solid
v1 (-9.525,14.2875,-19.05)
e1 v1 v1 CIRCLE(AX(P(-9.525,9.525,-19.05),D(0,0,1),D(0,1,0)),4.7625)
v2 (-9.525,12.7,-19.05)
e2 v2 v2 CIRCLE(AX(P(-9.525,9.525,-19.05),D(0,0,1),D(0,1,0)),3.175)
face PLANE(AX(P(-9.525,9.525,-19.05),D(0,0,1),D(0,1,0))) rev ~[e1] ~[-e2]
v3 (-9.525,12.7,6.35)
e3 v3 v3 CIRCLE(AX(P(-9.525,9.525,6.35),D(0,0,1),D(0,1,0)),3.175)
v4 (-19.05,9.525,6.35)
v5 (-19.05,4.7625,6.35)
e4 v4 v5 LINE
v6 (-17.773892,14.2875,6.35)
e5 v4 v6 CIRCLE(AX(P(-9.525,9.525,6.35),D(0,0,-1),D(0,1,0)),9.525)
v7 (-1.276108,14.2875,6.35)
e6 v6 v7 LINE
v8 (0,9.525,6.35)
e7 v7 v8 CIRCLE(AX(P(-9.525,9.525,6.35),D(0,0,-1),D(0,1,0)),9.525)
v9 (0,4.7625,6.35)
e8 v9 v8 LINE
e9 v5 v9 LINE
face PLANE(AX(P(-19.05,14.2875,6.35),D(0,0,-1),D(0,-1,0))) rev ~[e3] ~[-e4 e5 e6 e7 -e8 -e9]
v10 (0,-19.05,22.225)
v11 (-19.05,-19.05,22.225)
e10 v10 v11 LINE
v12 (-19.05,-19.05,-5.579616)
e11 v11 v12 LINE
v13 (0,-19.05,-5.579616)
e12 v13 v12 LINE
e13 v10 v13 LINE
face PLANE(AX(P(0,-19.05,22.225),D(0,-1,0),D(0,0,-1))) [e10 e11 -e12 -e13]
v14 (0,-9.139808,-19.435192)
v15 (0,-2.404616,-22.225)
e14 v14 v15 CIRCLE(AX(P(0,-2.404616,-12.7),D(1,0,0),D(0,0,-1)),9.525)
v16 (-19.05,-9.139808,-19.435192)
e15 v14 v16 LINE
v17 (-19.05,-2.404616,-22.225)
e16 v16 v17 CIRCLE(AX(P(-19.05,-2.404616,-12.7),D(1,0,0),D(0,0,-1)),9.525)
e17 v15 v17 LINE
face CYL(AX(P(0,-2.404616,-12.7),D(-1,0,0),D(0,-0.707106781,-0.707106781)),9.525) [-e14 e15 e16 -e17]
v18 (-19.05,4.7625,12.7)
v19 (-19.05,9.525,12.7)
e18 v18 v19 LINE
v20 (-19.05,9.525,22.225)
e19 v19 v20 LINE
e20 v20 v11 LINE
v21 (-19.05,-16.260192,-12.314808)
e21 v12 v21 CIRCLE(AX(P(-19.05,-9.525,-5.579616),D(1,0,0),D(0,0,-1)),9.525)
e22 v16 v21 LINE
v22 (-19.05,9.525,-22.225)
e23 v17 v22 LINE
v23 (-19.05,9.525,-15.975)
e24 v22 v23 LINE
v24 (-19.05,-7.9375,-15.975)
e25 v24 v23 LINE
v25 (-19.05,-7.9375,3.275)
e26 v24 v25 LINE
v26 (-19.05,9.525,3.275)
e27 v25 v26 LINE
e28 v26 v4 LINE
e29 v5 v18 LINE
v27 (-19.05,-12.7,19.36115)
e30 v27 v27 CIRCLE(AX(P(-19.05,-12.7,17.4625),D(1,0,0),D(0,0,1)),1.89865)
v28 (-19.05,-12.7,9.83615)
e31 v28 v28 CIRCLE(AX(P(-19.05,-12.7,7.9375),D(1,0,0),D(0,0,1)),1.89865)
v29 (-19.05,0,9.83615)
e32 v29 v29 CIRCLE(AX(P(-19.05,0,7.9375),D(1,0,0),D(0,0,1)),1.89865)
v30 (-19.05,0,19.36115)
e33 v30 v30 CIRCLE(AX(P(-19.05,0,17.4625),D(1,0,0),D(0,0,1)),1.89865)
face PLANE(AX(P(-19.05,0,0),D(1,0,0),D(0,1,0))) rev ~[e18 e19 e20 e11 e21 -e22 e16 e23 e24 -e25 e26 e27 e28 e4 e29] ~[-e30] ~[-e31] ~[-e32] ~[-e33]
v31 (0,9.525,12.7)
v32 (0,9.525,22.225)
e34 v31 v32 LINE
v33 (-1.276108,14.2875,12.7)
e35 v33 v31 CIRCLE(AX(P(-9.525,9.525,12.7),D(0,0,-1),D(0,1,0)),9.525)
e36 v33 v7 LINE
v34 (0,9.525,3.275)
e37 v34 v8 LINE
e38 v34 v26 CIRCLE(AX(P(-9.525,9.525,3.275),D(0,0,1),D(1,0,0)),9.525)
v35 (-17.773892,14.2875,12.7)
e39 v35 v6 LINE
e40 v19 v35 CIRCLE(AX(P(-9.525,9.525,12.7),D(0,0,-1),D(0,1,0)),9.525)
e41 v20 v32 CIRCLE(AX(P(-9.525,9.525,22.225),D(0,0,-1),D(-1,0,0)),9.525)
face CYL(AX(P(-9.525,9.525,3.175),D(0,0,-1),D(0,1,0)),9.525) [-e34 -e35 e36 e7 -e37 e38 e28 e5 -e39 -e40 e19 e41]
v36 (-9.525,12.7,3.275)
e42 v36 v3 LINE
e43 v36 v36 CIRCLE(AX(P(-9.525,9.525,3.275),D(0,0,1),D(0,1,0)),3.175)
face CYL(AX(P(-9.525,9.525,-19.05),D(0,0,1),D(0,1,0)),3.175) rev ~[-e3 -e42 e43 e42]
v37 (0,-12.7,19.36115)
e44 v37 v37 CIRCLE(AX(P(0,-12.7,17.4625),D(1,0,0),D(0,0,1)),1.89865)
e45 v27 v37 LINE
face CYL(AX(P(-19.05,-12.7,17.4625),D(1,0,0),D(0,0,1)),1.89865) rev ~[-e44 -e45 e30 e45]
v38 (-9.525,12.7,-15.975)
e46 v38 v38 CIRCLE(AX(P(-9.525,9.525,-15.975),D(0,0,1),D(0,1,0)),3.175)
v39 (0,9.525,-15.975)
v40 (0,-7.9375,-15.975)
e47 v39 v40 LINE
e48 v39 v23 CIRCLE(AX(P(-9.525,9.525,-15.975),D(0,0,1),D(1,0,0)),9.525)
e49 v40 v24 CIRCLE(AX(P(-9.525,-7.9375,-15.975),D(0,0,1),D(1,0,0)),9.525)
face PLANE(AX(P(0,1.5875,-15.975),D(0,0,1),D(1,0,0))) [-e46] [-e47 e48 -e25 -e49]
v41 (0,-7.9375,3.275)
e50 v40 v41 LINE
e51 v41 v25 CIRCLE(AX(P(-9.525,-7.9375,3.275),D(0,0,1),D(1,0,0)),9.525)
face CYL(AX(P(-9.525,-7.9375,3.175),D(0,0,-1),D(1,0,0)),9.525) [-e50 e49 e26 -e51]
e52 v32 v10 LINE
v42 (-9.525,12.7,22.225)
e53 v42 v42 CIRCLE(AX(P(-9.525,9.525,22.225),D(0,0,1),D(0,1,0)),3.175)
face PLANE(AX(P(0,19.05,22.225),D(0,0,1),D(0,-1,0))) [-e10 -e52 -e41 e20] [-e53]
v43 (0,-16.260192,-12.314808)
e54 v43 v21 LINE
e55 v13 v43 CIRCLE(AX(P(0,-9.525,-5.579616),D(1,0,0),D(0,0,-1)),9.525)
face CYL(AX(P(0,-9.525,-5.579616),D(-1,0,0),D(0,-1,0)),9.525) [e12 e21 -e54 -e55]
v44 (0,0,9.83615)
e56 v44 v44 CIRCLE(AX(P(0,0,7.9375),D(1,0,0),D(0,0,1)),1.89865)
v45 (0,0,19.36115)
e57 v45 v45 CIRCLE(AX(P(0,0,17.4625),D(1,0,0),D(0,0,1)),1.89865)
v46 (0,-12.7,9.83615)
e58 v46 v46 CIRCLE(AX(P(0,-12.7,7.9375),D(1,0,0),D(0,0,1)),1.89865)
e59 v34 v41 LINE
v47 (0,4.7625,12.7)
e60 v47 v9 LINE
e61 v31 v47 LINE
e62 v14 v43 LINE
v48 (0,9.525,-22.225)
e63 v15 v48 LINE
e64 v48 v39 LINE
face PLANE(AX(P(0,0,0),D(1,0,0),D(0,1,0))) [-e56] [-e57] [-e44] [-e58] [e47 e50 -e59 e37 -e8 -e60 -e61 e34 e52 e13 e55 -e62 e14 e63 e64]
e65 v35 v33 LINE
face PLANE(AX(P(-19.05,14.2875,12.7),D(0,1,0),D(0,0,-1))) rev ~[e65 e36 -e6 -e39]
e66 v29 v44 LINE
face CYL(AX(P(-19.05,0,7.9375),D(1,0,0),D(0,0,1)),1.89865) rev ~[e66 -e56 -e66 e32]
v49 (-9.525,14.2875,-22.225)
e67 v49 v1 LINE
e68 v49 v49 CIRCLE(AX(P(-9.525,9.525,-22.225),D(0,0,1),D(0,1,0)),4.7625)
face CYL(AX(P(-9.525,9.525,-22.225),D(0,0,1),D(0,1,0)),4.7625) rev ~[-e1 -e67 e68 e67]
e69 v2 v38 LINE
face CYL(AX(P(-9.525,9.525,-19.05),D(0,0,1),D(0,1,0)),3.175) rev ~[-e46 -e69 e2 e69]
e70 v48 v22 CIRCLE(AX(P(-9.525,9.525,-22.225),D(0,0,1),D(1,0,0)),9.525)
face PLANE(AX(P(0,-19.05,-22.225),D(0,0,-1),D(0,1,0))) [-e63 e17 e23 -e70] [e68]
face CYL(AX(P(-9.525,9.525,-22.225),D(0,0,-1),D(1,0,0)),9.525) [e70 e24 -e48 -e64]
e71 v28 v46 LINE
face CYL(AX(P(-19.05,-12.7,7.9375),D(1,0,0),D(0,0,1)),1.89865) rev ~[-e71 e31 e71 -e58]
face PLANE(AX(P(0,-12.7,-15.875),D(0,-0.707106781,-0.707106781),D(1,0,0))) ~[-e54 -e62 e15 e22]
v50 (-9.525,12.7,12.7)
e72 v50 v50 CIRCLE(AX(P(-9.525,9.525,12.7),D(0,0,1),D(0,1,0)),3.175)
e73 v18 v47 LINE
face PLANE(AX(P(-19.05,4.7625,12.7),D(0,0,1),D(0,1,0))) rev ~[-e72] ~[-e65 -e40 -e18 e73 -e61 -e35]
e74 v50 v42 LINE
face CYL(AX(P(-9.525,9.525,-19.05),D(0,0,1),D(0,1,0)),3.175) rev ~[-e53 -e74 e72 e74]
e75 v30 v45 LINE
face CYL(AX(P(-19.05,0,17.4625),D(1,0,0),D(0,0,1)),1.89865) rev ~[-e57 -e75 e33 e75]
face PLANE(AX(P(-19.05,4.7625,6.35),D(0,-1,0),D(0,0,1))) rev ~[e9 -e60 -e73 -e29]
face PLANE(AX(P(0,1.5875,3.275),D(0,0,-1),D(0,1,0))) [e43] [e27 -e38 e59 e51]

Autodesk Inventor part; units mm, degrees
ref_plane "YZ Plane" through (0, 0, 0) normal (1, 0, 0) x (0, 1, 0)
ref_plane "XZ Plane" through (0, 0, 0) normal (0, 1, 0) x (-1, 0, 0)
ref_plane "XY Plane" through (0, 0, 0) normal (0, 0, 1) x (1, 0, 0)
sketch "Sketch1" plane through (0, 0, 0) normal (1, 0, 0) x (0, 1, 0)
  line L0 (19.05, 22.225) -> (-19.05, 22.225)
  line L1 (-19.05, 22.225) -> (-19.05, -22.225)
  line L2 (-19.05, -22.225) -> (19.05, -22.225)
  line L3 (19.05, -22.225) -> (19.05, 22.225)
  line L4 (19.05, 22.225) -> (-19.05, -22.225) construction
  line L5 (-19.05, 22.225) -> (19.05, -22.225) construction
  line L6 (19.05, -15.875) -> (1.5875, -15.875)
  line L7 (1.5875, -15.875) -> (1.5875, 3.175)
  line L8 (1.5875, 3.175) -> (19.05, 3.175)
  line L9 (19.05, 3.175) -> (19.05, -15.875)
  line L10 (-19.05, 17.4625) -> (19.05, 17.4625) construction
  point P0 (0, 0)
  point P1 (-12.7, 17.4625)
  point P2 (0, 17.4625)
  point P3 (-12.7, 7.9375)
  point P4 (0, 7.9375)
  dimension "d0" = 38.1
  dimension "d1" = 44.45
  dimension "d2" = 17.4625
  dimension "d3" = 19.05
  dimension "d4" = 6.35
  dimension "d31" = 4.7625
  dimension "d32" = 6.35
  dimension "d35" = 12.7
  dimension "d38" = 9.525
extrude "Extrusion1" add sketch "Sketch1" against normal blind 19.05 contours L3 L8 L7 L6 L2 L1 L0
sketch "Sketch2" plane through (0, -19.05, -22.225) normal (0, 0, -1) x (-1, 0, 0)
  line L0 (0, 38.1) -> (19.05, 38.1) projected
  line L1 (0, 0) -> (0, 38.1) projected
  point P0 (0, 19.05)
  point P1 (9.525, 28.575)
  dimension "d7" = 9.525
  dimension "d8" = 9.525
hole "Hole1" at (-9.525, 9.525, -22.225) direction (0, 0, 1) diameter 6.35 end through all counterbore diameter 9.525 counterbore depth 3.175
sketch "Sketch3" plane through (-19.05, 0, 0) normal (-1, 0, 0) x (0, 0, 1)
  line L0 (3.175, 6.35) -> (3.175, 12.7) projected
  line L1 (22.225, 12.7) -> (22.225, 6.35) projected
  line L2 (3.175, 6.35) -> (3.175, 12.7) projected
  line L3 (3.175, 19.05) -> (3.175, 1.5875) projected
  line L4 (3.175, 9.525) -> (22.225, 9.525) construction
  line L5 (22.225, -19.05) -> (22.225, 19.05) projected
  line L6 (22.225, 19.05) -> (3.175, 19.05) projected
  line L7 (12.7, 14.2875) -> (6.35, 14.2875)
  line L8 (6.35, 14.2875) -> (6.35, 4.7625)
  line L9 (6.35, 4.7625) -> (12.7, 4.7625)
  line L10 (12.7, 4.7625) -> (12.7, 14.2875)
  line L11 (12.7, 14.2875) -> (6.35, 4.7625) construction
  line L12 (6.35, 14.2875) -> (12.7, 4.7625) construction
  point P0 (0, 0)
  point P1 (9.525, 9.525)
  dimension "d16" = 9.525
  dimension "d17" = 6.35
  dimension "d18" = 9.525
  dimension "d19" = 3.175
extrude "Extrusion2" cut sketch "Sketch3" against normal through all
fillet "Fillet1" radius 9.525 6 edges at (0, 19.05, 12.7) (0, 19.05, -19.05) (-19.05, 19.05, -19.05) (-19.05, 19.05, 12.7) (-19.05, 1.5875, -6.35) (0, 1.5875, -6.35)
chamfer "Chamfer1" distance 12.7 angle 45 1 edges at (-9.525, -19.05, -22.225)
fillet "Fillet2" radius 9.525 2 edges at (-9.525, -6.35, -22.225) (-9.525, -19.05, -9.525)
thicken "Thicken1" operation add thickness 0.1 both sides no extend neighbours yes toward (0, 0, 1) faces at (-3.6754, 5.7159, 3.175)
thicken "Thicken2" operation add thickness 0.1 both sides no extend neighbours yes toward (0, 0, -1) faces at (-3.6754, 5.7159, -15.875)
hole "Hole2" at (0, -12.7, 17.4625) at (0, 0, 17.4625) at (0, -12.7, 7.9375) at (0, 0, 7.9375) direction (-1, 0, 0) diameter 3.175 end through all
sketch "Sketch4" plane through (-19.05, 0, 0) normal (-1, 0, 0) x (0, 0, 1)
  point P0 (17.4625, 0)
  point P1 (7.9375, 0)
  point P2 (7.9375, -12.7)
  point P3 (17.4625, -12.7)
  point P4 (93.6625, -12.7)
  point P5 (84.1375, -12.7)
  point P6 (84.1375, 0)
  point P7 (93.6625, 0)
hole "Hole3" at (-19.05, 0, 17.4625) at (-19.05, 0, 7.9375) at (-19.05, -12.7, 7.9375) at (-19.05, -12.7, 17.4625) at (-19.05, -12.7, 93.6625) at (-19.05, -12.7, 84.1375) at (-19.05, 0, 84.1375) at (-19.05, 0, 93.6625) direction (1, 0, 0) diameter 3.7973 depth 19.05
properties part number "Side Mounts" material "Nylon 6/6"
